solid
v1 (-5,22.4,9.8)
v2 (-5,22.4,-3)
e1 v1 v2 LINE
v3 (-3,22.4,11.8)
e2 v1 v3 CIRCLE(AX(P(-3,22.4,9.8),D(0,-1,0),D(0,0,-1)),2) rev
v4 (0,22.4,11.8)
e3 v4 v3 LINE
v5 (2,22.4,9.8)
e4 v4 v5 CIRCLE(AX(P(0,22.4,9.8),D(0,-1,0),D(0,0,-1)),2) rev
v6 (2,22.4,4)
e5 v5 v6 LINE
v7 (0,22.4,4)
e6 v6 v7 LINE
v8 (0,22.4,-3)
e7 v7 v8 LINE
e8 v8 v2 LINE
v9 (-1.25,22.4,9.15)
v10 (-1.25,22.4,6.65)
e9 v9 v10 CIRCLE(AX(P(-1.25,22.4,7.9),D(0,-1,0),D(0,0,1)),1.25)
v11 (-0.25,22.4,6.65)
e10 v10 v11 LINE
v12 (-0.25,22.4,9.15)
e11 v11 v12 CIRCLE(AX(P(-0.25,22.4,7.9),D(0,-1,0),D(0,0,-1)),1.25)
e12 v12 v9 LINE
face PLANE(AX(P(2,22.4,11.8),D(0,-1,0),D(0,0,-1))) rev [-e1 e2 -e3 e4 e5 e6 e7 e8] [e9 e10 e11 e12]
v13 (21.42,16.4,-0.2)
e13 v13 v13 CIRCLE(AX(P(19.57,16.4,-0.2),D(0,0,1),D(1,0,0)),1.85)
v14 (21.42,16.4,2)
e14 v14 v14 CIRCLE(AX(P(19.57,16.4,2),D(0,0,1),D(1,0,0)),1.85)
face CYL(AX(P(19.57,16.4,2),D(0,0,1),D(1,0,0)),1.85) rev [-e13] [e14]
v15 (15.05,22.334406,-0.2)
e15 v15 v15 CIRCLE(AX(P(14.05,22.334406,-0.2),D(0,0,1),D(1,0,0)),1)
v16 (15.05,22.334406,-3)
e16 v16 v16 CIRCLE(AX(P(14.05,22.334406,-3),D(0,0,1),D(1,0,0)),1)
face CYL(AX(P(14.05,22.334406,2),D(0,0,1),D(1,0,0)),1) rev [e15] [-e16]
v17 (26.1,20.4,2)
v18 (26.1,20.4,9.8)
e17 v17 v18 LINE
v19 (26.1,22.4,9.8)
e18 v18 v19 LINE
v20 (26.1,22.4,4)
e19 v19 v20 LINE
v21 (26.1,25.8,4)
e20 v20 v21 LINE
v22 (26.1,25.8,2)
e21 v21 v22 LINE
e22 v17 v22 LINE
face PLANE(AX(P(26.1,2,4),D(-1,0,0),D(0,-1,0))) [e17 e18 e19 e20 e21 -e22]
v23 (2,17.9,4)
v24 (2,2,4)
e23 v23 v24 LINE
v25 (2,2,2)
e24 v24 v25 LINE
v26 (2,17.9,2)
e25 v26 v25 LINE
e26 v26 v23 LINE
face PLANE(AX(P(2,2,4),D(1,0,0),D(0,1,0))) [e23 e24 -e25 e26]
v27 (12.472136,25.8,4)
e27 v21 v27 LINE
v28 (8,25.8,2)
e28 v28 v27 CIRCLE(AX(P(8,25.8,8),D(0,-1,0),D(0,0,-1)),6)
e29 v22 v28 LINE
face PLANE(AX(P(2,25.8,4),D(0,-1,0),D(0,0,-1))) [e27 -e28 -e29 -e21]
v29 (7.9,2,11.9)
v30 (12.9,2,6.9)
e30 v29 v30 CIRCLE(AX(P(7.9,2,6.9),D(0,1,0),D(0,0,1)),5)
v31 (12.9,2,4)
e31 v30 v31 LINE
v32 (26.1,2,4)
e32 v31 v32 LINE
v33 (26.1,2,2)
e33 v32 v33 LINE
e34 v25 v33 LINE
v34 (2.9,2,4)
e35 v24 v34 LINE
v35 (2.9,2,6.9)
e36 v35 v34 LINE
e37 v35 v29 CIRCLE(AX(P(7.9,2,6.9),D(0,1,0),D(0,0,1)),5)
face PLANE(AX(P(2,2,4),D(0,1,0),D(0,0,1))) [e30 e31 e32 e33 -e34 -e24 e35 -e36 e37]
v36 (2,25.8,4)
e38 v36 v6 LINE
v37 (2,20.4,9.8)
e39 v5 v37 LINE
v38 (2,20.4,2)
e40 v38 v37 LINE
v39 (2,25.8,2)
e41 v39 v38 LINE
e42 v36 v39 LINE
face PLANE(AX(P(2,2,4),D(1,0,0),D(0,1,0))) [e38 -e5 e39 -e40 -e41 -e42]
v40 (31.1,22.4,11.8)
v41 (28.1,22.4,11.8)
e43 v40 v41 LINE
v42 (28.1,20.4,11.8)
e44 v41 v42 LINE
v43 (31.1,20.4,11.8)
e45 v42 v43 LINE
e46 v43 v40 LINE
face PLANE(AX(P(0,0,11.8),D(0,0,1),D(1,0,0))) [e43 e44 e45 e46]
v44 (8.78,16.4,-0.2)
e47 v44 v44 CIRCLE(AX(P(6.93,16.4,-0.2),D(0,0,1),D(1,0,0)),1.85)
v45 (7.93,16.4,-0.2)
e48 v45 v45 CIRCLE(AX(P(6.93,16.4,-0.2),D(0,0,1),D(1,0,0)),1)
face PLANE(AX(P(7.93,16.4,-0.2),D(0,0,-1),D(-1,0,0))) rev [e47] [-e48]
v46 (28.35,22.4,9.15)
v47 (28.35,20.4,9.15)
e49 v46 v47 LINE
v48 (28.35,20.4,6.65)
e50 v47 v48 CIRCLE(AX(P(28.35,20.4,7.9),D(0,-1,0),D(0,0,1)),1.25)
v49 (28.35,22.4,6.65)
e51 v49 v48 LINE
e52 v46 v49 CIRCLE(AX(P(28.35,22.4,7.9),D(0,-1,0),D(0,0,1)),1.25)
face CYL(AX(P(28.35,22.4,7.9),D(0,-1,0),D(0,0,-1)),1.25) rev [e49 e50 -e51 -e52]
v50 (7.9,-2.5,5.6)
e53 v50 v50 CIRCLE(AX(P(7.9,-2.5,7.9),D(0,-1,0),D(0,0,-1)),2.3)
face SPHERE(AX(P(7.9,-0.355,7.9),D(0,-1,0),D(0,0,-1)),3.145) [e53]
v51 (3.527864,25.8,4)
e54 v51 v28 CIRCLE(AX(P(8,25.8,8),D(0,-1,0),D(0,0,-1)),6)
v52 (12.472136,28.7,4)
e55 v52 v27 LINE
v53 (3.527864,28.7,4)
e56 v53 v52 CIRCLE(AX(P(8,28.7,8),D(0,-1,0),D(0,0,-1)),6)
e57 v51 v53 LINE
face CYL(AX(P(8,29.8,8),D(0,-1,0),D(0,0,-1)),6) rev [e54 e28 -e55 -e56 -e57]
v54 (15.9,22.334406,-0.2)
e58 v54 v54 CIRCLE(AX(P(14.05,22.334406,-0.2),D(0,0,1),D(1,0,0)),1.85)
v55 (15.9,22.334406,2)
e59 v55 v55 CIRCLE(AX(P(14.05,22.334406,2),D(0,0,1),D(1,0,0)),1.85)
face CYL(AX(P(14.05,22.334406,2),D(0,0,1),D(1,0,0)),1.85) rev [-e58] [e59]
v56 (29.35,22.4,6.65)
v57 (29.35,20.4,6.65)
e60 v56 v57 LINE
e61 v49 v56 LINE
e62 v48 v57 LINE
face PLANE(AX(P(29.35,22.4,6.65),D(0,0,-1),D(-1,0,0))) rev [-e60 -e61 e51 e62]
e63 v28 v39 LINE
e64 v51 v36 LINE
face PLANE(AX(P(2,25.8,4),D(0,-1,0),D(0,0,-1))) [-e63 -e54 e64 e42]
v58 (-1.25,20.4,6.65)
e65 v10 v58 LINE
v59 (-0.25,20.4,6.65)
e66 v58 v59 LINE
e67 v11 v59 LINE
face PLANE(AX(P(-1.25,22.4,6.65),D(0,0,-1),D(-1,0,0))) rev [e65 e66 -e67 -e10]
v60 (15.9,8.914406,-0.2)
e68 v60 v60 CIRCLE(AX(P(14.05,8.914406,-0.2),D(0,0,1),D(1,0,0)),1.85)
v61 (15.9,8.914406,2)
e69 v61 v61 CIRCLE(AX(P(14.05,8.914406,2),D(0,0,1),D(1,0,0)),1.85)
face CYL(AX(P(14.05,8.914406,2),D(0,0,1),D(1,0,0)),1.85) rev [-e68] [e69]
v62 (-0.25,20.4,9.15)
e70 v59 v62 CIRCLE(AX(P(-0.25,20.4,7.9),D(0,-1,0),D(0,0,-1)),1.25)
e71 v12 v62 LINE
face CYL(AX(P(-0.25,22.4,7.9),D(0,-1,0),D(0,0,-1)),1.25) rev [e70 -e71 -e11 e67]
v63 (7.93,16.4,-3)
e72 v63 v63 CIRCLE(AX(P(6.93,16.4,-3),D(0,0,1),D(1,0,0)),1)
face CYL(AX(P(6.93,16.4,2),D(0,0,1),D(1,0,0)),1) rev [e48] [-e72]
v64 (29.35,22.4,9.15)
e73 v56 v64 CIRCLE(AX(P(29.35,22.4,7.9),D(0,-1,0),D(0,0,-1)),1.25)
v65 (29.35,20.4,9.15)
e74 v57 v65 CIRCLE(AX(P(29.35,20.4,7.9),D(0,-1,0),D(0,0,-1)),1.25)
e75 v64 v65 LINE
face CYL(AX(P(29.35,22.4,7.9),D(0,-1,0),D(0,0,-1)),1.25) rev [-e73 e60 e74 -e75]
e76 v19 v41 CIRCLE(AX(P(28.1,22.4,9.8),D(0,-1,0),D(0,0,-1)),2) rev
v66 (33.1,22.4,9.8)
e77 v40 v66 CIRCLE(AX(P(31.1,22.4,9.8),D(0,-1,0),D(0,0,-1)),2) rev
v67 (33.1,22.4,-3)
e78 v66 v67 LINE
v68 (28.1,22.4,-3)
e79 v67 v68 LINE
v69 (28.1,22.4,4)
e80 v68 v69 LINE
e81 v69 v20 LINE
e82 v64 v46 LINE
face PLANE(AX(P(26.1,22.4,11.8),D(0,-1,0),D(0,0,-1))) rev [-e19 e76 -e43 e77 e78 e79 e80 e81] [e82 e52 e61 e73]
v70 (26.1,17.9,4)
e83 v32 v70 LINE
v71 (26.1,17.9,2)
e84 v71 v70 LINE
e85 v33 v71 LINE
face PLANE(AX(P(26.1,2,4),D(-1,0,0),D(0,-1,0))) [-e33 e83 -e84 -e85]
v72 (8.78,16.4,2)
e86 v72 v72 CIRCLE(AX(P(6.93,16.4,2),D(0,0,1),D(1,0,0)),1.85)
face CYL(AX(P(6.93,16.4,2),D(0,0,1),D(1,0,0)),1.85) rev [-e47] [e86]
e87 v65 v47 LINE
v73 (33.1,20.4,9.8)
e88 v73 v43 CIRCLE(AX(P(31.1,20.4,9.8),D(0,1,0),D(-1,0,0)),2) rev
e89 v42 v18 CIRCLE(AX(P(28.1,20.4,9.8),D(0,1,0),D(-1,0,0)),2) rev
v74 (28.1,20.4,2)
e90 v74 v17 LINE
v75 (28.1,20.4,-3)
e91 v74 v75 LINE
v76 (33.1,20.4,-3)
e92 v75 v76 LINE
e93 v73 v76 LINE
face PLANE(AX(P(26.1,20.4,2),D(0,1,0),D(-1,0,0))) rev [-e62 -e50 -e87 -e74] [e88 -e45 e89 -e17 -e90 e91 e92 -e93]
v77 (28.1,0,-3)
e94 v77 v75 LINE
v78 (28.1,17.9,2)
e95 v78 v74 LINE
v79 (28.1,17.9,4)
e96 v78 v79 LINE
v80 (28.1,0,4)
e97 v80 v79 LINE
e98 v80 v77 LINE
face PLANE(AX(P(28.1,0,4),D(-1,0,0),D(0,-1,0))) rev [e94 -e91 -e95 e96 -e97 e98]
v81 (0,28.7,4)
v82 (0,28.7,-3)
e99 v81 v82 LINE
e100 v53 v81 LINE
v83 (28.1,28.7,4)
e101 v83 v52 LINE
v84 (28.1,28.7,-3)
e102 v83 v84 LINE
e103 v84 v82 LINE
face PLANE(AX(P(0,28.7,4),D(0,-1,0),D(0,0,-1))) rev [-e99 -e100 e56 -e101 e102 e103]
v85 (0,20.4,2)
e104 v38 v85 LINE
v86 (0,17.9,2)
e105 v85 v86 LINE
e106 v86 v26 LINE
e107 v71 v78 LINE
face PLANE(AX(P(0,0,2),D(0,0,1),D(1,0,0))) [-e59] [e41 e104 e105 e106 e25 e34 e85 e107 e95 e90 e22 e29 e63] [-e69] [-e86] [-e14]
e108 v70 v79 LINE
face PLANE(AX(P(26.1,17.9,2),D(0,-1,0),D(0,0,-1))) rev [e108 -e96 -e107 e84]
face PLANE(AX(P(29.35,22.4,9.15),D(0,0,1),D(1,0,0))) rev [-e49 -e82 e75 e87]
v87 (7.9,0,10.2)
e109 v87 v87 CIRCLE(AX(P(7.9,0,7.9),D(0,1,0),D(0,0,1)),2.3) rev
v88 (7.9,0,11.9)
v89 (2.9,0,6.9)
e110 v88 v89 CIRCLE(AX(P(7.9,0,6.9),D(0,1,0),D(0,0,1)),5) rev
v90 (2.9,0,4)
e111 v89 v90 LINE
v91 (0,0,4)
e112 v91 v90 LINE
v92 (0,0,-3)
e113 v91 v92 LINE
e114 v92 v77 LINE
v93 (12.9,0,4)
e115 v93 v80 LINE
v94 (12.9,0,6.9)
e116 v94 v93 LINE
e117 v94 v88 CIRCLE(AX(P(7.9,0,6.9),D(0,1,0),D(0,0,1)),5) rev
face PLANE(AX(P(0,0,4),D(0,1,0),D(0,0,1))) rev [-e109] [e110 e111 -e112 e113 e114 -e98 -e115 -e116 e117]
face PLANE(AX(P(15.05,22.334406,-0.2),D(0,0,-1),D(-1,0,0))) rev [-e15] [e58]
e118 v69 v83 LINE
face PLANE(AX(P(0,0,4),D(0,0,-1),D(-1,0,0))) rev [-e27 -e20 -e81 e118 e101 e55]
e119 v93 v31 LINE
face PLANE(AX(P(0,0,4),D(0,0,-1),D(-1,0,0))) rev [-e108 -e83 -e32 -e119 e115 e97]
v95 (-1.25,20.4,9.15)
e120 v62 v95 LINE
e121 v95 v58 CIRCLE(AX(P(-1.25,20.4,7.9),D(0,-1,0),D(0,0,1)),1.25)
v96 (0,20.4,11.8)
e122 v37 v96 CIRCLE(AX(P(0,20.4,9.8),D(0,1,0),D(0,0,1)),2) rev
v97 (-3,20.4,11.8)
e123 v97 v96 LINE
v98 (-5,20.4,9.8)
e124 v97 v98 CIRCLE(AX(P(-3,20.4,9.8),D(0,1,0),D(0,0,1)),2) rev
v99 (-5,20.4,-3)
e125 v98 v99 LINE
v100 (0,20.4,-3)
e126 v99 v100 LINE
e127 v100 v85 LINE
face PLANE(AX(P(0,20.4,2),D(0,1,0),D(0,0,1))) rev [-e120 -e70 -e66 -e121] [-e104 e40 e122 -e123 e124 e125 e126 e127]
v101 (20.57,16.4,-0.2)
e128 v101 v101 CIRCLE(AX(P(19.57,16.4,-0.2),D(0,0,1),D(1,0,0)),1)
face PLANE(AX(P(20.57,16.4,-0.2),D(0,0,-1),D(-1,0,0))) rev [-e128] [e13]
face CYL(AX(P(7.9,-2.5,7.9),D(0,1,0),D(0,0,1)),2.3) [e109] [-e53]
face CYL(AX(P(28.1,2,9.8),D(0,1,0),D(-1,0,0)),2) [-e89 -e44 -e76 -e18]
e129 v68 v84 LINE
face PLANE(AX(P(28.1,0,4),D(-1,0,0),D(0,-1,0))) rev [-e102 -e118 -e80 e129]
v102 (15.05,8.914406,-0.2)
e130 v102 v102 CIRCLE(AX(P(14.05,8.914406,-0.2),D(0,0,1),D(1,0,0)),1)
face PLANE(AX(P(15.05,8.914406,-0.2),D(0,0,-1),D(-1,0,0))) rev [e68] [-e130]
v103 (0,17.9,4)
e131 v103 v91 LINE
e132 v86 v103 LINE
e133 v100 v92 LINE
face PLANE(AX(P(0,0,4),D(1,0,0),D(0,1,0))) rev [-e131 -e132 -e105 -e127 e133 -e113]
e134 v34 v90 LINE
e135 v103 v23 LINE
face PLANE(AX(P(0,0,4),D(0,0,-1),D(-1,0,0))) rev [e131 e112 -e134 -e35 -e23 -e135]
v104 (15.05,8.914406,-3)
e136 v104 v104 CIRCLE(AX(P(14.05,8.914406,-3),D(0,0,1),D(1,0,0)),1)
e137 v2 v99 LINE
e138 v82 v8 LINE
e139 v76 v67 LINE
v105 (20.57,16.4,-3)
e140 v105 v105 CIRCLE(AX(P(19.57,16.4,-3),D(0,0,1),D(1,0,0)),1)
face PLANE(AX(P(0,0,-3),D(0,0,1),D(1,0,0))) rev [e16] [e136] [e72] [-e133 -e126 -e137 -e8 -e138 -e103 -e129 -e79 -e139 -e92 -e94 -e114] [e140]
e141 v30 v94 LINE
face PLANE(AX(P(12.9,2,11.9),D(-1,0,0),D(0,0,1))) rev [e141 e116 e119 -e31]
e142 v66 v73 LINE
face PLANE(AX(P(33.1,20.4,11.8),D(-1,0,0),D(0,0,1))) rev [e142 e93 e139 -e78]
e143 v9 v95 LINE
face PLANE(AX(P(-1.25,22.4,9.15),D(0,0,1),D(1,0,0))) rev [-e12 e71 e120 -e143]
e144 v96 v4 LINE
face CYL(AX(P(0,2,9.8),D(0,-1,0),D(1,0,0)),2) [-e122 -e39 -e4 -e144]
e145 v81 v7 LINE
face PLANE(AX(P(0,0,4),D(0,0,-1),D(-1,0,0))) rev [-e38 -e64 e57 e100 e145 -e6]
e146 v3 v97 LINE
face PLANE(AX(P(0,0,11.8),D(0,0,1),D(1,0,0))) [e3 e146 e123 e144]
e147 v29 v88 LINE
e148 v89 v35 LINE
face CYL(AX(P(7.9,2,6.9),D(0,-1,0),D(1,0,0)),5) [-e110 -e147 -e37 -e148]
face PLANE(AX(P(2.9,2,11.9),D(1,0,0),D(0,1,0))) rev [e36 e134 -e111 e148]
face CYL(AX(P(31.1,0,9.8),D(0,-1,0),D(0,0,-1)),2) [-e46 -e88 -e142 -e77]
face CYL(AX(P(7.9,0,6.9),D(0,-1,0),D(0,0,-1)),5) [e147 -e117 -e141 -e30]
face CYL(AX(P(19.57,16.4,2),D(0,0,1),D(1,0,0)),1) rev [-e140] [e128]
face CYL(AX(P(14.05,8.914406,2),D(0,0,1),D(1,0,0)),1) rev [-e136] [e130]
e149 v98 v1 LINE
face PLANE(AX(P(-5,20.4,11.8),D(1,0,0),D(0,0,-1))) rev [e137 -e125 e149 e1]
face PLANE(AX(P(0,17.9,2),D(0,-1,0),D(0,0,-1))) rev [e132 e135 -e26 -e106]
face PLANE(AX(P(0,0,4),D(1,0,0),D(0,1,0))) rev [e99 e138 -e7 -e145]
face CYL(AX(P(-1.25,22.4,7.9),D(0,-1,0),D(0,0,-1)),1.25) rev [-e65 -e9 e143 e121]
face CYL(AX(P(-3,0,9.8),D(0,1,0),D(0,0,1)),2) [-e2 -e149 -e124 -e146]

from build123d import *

# Parameters (mm, degrees)
SKETCH4_W                        = 24.1
SKETCH4_H                        = 23.8
BOSS_EXTRUDE2_DEPTH              = 2
SKETCH1_W                        = 28.1
SKETCH1_H                        = 28.7
SKETCH1_W_2                      = 24.1
SKETCH1_H_2                      = 23.8
BOSS_EXTRUDE3_DEPTH              = 4
SKETCH6_W                        = 2
SKETCH6_H                        = 2.5
CUT_EXTRUDE2_DEPTH               = 2
SKETCH8_W                        = 7
SKETCH8_H                        = 2
BOSS_EXTRUDE4_DEPTH              = 11.8
SKETCH11_R                       = 6
CUT_EXTRUDE4_DEPTH               = 4
SKETCH12_W                       = 10
SKETCH12_H                       = 2
BOSS_EXTRUDE5_DEPTH              = 7.9
FILLET9_R                        = 5
FILLET10_R                       = 5
SKETCH14_R                       = 2.3
BOSS_EXTRUDE6_DEPTH              = 2.5
DOME3_FACE_RADIUS                = 2.3
DOME3_HEIGHT                     = 1
FILLET11_R                       = 2
FILLET12_R                       = 2
FILLET13_R                       = 2
FILLET14_R                       = 2
BOSS_EXTRUDE7_DEPTH              = 3
SKETCH19_R                       = 0.3
CUT_EXTRUDE6_DEPTH               = 2
CBORE_START                      = -0.2
CBORE_FOR_M1_6_SHCS1_OUTLINE_R   = 1.85
CBORE_FOR_M1_6_SHCS1_DEPTH       = 2.2
CBORE_START_2                    = -3
CBORE_FOR_M1_6_SHCS1_2_OUTLINE_R = 1
CBORE_FOR_M1_6_SHCS1_2_DEPTH     = 2.8
CUT_EXTRUDE8_DEPTH               = 2


# Read off the part's stored shape, not the designer's step: CBORE for M1.6 SHCS1
with BuildPart() as part:
    # Sketch4 → Boss-Extrude2 (new body)
    with BuildSketch(Plane.XY):
        with Locations((14.05, 13.9)):
            Rectangle(SKETCH4_W, SKETCH4_H)
    extrude(amount=BOSS_EXTRUDE2_DEPTH)

    # Sketch1 → Boss-Extrude3 (add)
    with BuildSketch(Plane.XY):
        with Locations((14.05, 14.35)):
            Rectangle(SKETCH1_W, SKETCH1_H)
        with Locations((14.05, 13.9)):
            Rectangle(SKETCH1_W_2, SKETCH1_H_2, mode=Mode.SUBTRACT)
    extrude(amount=BOSS_EXTRUDE3_DEPTH)

    # Sketch6 → Cut-Extrude2 (cut)
    with BuildSketch(Plane.XY.offset(4)):
        with Locations((1, 19.15)):
            Rectangle(SKETCH6_W, SKETCH6_H)
        with Locations((27.1, 19.15)):
            Rectangle(SKETCH6_W, SKETCH6_H)
    extrude(amount=-CUT_EXTRUDE2_DEPTH, mode=Mode.SUBTRACT)

    # Sketch8 → Boss-Extrude4 (add)
    with BuildSketch(Plane.XY):
        with Locations((-1.5, 21.4)):
            Rectangle(SKETCH8_W, SKETCH8_H)
        with Locations((29.6, 21.4)):
            Rectangle(SKETCH8_W, SKETCH8_H)
    extrude(amount=BOSS_EXTRUDE4_DEPTH)

    # Sketch11 → Cut-Extrude4 (cut)
    with BuildSketch(Plane(origin=(0, 25.8, 0), x_dir=(-1, 0, 0), z_dir=(0, -1, 0))):
        with Locations((-8, -8)):
            Circle(SKETCH11_R)
    extrude(amount=-CUT_EXTRUDE4_DEPTH, mode=Mode.SUBTRACT)

    # Sketch12 → Boss-Extrude5 (add)
    with BuildSketch(Plane.XY.offset(4)):
        with Locations((7.9, 1)):
            Rectangle(SKETCH12_W, SKETCH12_H)
    extrude(amount=BOSS_EXTRUDE5_DEPTH)

    # Fillet9
    fillet9_edges = [part.edges().sort_by_distance(p)[0] for p in [
        (2.9, 1, 11.9),
    ]]
    fillet(fillet9_edges, radius=FILLET9_R)

    # Fillet10
    fillet10_edges = [part.edges().sort_by_distance(p)[0] for p in [
        (12.9, 1, 11.9),
    ]]
    fillet(fillet10_edges, radius=FILLET10_R - 0.0001)  # a hair under: the kernel refuses the full size

    # Sketch14 → Boss-Extrude6 (add)
    with BuildSketch(Plane(origin=(0, 0, 0), x_dir=(-1, 0, 0), z_dir=(0, -1, 0))):
        with Locations(Location((-7.9, -7.9, 0), (0, 0, 270))):
            Circle(SKETCH14_R)
    extrude(amount=BOSS_EXTRUDE6_DEPTH)

    # Dome3: a dome of height H over a round flat face of radius A is a cap of a sphere of radius (A * A + H * H) / (2 * H)
    dome3_r = (DOME3_FACE_RADIUS * DOME3_FACE_RADIUS + DOME3_HEIGHT * DOME3_HEIGHT) / (2 * DOME3_HEIGHT)
    dome3_base = Plane((7.9, -2.5, 7.9), z_dir=(0, -1, 0))
    with Locations(dome3_base.offset(DOME3_HEIGHT - dome3_r)):
        dome3_ball = Sphere(dome3_r, mode=Mode.PRIVATE)
    add(split(dome3_ball, bisect_by=dome3_base, keep=Keep.TOP, mode=Mode.PRIVATE))

    # Fillet11
    fillet11_edges = [part.edges().sort_by_distance(p)[0] for p in [
        (2, 21.4, 11.8),
    ]]
    fillet(fillet11_edges, radius=FILLET11_R)

    # Fillet12
    fillet12_edges = [part.edges().sort_by_distance(p)[0] for p in [
        (-5, 21.4, 11.8),
    ]]
    fillet(fillet12_edges, radius=FILLET12_R)

    # Fillet13
    fillet13_edges = [part.edges().sort_by_distance(p)[0] for p in [
        (33.1, 21.4, 11.8),
    ]]
    fillet(fillet13_edges, radius=FILLET13_R)

    # Fillet14
    fillet14_edges = [part.edges().sort_by_distance(p)[0] for p in [
        (26.1, 21.4, 11.8),
    ]]
    fillet(fillet14_edges, radius=FILLET14_R)

    # Sketch16 → Boss-Extrude7 (add)
    with BuildSketch(Plane.XY):
        Polygon((33.1, 22.4), (28.1, 22.4), (28.1, 28.7), (0, 28.7), (0, 22.4), (-5, 22.4), (-5, 20.4), (0, 20.4), (0, 0), (28.1, 0), (28.1, 20.4), (33.1, 20.4), align=None)
    extrude(amount=-BOSS_EXTRUDE7_DEPTH)

    # Sketch19 → Cut-Extrude6 (cut)
    with BuildSketch(Plane.XY):
        with Locations((19.57, 15.62440581)):
            Circle(SKETCH19_R)
        with Locations((13.25, 22.33440581)):
            Circle(SKETCH19_R)
        with Locations(Location((6.93, 15.62440581, 0), (0, 0, 180))):
            Circle(SKETCH19_R)
        with Locations(Location((13.25, 8.91440581, 0), (0, 0, 180))):
            Circle(SKETCH19_R)
    extrude(amount=CUT_EXTRUDE6_DEPTH, mode=Mode.SUBTRACT)

    # CBORE for M1.6 SHCS1 outline → CBORE for M1.6 SHCS1 (cut)
    with BuildSketch(Plane.XY.offset(CBORE_START)):
        with Locations((14.05, 8.91440581)):
            Circle(CBORE_FOR_M1_6_SHCS1_OUTLINE_R)
        with Locations((19.57, 16.4)):
            Circle(CBORE_FOR_M1_6_SHCS1_OUTLINE_R)
        with Locations((14.05, 22.33440581)):
            Circle(CBORE_FOR_M1_6_SHCS1_OUTLINE_R)
        with Locations((6.93, 16.4)):
            Circle(CBORE_FOR_M1_6_SHCS1_OUTLINE_R)
    extrude(amount=CBORE_FOR_M1_6_SHCS1_DEPTH, mode=Mode.SUBTRACT)

    # CBORE for M1.6 SHCS1 2 outline → CBORE for M1.6 SHCS1 2 (cut)
    with BuildSketch(Plane.XY.offset(CBORE_START_2)):
        with Locations((14.05, 8.91440581)):
            Circle(CBORE_FOR_M1_6_SHCS1_2_OUTLINE_R)
        with Locations((19.57, 16.4)):
            Circle(CBORE_FOR_M1_6_SHCS1_2_OUTLINE_R)
        with Locations((14.05, 22.33440581)):
            Circle(CBORE_FOR_M1_6_SHCS1_2_OUTLINE_R)
        with Locations((6.93, 16.4)):
            Circle(CBORE_FOR_M1_6_SHCS1_2_OUTLINE_R)
    extrude(amount=CBORE_FOR_M1_6_SHCS1_2_DEPTH, mode=Mode.SUBTRACT)

    # Sketch10 → Cut-Extrude8 (cut)
    with BuildSketch(Plane(origin=(0, 20.4, 0), x_dir=(-1, 0, 0), z_dir=(0, -1, 0))):
        with BuildLine():
            Line((-29.35, -6.65), (-28.35, -6.65))
            ThreePointArc((-28.35, -6.65), (-27.1, -7.9), (-28.35, -9.15))
            Line((-28.35, -9.15), (-29.35, -9.15))
            ThreePointArc((-29.35, -9.15), (-30.6, -7.9), (-29.35, -6.65))
        make_face()
        with BuildLine():
            Line((1.25, -6.65), (0.25, -6.65))
            ThreePointArc((0.25, -6.65), (-1, -7.9), (0.25, -9.15))
            Line((0.25, -9.15), (1.25, -9.15))
            ThreePointArc((1.25, -9.15), (2.5, -7.9), (1.25, -6.65))
        make_face()
    extrude(amount=-CUT_EXTRUDE8_DEPTH, mode=Mode.SUBTRACT)


solid = part.part
